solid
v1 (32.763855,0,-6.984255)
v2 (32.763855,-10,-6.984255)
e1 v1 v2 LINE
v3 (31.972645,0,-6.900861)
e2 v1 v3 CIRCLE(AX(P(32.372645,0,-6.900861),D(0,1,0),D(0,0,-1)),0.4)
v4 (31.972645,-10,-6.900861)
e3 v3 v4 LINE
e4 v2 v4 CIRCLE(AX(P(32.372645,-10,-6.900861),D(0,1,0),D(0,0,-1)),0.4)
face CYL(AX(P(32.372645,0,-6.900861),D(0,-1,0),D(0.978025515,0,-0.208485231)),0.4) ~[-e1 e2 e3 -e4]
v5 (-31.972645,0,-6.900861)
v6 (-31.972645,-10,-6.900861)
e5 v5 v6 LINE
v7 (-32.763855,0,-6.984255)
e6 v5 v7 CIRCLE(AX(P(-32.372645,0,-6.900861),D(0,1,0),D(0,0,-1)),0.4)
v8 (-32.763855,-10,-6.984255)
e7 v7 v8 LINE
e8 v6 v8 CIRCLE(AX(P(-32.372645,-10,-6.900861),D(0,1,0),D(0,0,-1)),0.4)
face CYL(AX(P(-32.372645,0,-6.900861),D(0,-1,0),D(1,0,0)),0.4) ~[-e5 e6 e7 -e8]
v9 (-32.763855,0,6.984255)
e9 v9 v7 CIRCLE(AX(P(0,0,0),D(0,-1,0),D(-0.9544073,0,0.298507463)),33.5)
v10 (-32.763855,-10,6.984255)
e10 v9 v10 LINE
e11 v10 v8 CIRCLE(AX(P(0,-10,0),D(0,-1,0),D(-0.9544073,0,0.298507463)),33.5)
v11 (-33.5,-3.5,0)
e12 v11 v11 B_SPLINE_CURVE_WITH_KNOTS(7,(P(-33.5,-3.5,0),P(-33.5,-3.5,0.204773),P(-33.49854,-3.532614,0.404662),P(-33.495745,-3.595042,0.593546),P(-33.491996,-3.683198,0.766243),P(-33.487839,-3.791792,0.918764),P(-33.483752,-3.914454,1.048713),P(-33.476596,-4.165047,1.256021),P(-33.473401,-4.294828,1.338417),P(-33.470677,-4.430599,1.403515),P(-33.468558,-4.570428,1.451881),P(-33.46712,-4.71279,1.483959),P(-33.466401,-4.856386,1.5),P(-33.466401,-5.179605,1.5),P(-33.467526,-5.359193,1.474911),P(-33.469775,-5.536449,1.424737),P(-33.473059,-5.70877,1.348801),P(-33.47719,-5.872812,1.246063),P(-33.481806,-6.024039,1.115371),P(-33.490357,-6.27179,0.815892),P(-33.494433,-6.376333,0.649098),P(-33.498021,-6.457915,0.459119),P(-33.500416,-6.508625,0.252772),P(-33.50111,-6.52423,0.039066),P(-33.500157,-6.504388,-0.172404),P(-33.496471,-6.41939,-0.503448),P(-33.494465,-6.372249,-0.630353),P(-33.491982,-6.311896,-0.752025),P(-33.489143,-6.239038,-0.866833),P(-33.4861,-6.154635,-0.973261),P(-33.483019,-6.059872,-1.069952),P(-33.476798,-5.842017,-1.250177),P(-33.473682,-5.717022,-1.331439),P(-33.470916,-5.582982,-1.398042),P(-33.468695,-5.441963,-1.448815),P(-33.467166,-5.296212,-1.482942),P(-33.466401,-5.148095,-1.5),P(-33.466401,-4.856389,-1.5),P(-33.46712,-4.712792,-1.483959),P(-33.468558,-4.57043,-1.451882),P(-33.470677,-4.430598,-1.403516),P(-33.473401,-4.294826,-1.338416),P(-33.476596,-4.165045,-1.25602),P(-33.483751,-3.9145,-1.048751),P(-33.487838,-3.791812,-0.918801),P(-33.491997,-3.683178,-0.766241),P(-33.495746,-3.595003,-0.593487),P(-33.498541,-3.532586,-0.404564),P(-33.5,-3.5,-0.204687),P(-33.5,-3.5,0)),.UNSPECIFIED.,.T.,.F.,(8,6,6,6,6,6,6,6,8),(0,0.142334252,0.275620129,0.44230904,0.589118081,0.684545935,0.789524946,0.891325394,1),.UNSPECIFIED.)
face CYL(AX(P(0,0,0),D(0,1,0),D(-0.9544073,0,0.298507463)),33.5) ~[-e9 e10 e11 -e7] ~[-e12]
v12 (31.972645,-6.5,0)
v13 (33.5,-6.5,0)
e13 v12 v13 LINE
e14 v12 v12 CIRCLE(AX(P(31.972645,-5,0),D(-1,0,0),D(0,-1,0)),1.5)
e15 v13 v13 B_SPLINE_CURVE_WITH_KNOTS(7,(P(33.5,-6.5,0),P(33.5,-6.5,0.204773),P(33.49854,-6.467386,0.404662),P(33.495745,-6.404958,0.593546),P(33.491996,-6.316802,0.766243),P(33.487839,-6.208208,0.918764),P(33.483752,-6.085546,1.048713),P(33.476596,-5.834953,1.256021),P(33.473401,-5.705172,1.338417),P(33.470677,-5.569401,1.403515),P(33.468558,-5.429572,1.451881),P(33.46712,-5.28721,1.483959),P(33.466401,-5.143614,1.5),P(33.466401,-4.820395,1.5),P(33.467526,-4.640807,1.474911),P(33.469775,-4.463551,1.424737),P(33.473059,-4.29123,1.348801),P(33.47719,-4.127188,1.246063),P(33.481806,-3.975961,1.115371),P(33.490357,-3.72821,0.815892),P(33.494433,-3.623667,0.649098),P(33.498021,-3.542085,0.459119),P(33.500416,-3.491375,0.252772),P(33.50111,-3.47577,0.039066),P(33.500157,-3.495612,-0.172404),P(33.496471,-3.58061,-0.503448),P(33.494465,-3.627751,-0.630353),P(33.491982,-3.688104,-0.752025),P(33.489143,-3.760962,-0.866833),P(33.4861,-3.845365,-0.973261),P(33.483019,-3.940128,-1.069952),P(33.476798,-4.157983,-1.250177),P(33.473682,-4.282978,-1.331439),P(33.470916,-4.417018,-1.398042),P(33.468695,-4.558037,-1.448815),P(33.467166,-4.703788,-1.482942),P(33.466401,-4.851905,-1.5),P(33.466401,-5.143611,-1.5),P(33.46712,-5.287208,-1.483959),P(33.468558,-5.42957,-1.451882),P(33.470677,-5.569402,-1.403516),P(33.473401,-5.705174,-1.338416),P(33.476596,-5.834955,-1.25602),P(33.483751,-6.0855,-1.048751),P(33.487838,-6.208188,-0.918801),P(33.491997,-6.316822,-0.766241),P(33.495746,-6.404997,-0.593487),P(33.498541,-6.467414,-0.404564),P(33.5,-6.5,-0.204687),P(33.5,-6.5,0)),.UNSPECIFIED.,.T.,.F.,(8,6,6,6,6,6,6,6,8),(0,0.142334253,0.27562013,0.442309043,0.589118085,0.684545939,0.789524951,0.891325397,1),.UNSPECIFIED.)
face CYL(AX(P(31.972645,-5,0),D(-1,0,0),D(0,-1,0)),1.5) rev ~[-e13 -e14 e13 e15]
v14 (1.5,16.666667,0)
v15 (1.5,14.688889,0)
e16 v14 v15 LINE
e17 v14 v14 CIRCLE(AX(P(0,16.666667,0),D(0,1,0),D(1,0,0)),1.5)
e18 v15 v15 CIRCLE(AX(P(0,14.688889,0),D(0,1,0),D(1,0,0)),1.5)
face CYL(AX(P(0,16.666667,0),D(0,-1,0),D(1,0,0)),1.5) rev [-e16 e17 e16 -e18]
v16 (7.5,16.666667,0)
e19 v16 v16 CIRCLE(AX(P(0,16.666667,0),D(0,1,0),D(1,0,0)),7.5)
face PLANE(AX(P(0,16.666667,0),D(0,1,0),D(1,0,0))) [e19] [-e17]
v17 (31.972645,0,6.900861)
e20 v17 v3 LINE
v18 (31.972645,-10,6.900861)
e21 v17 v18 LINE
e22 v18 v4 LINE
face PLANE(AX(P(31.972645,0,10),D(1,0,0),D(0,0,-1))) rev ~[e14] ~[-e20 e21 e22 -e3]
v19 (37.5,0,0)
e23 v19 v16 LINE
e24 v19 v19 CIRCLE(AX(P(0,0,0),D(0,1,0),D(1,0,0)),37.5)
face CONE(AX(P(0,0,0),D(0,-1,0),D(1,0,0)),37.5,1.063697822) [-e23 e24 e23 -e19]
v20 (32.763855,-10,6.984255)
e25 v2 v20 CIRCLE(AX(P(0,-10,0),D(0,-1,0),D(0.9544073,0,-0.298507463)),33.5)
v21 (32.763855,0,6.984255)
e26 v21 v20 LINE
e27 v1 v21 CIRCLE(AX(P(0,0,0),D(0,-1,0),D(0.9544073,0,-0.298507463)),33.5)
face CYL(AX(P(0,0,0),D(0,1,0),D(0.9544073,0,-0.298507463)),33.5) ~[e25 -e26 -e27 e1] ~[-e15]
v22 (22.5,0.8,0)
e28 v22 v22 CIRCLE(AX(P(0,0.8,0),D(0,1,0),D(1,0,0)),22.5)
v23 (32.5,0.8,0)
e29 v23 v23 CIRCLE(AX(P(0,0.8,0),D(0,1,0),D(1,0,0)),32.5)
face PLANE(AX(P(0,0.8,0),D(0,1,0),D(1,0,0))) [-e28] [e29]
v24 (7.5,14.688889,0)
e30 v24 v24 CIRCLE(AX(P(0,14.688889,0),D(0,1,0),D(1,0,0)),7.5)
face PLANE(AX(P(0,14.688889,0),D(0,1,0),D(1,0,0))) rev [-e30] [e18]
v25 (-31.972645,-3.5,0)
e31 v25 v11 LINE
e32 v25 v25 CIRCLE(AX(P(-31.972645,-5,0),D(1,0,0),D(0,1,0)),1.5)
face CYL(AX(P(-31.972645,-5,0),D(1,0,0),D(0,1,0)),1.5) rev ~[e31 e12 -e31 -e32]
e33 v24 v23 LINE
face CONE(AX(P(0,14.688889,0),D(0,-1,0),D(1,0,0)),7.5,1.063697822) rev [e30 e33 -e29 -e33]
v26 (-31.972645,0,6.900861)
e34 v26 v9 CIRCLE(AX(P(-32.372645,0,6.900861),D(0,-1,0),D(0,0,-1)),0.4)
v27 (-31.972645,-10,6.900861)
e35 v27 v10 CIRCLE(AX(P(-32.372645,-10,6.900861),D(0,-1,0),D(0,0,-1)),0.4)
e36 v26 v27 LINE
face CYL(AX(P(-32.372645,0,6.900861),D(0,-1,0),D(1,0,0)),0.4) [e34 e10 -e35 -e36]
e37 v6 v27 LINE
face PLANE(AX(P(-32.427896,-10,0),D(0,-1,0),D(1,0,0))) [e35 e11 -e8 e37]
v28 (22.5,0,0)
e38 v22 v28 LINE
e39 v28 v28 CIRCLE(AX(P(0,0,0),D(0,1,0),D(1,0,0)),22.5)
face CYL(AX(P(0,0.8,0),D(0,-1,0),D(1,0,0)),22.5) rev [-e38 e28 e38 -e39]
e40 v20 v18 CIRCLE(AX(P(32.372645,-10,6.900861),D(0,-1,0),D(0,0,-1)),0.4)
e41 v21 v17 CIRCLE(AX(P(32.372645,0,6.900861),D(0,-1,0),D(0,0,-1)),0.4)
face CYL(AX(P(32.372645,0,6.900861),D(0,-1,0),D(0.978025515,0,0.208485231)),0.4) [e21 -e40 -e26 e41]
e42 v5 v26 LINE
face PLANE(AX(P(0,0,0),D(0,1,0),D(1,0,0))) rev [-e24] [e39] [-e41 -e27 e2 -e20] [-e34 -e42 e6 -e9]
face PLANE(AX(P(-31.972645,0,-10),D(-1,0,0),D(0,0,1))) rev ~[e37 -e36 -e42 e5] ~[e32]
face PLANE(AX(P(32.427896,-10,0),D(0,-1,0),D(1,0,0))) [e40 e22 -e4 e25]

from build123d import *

# Parameters (mm, degrees)
F3_DEPTH = 10
F4_R     = 1.5
F5_DEPTH = 25
F6_R     = 1.5
F7_DEPTH = 25
F8_F1_R  = 0.4
F8_F2_R  = 0.4
F8_F3_R  = 0.4
F8_F4_R  = 0.4


# Not quite as in the source:
# - a feature names something its author has since deleted; it is built from what else it names


with BuildPart() as f1:
    # F0 (on Top) → F1 (revolve)
    with BuildSketch(Plane.XY):
        Polygon((22.5, 0.8), (22.5, 0), (37.5, 0), (7.5, 16.6666666667), (1.5, 16.6666666667), (1.5, 14.6888888889), (7.5, 14.6888888889), (32.5, 0.8), align=None)
    revolve(axis=Axis((0, 10, 0), (0, 1, 0)))

    # F2 (on face) → F3 (join)
    with BuildSketch(Plane.XZ):
        with BuildLine():
            Line((-31.9726445575, -10), (-31.9726445575, 10))
            ThreePointArc((-31.9726445575, 10), (-33.5, 0), (-31.9726445575, -10))
        make_face()
        with BuildLine():
            ThreePointArc((31.9726445575, -10), (33.5, 0), (31.9726445575, 10))
            Line((31.9726445575, 10), (31.9726445575, -10))
        make_face()
    extrude(amount=F3_DEPTH)

    # F4 (on face) → F5 (cut)
    with BuildSketch(Plane.YZ.offset(-31.9726445575)):
        with Locations((-5, 0)):
            Circle(F4_R)
    extrude(amount=-F5_DEPTH, mode=Mode.SUBTRACT)

    # F6 (on face) → F7 (cut)
    with BuildSketch(Plane(origin=(31.9726445575, 0, 0), x_dir=(0, -1, 0), z_dir=(-1, 0, 0))):
        with Locations((5, 0)):
            Circle(F6_R)
    extrude(amount=-F7_DEPTH, mode=Mode.SUBTRACT)

    # F8: fillet of radius 0.4 on 4 edges, made by hand

    # F8_f1
    f8_f1_edges = [f1.edges().sort_by_distance(p)[0] for p in [
        (31.9726445575, -5, 10),
    ]]
    fillet(f8_f1_edges, radius=F8_F1_R)

    # F8_f2
    f8_f2_edges = [f1.edges().sort_by_distance(p)[0] for p in [
        (31.9726445575, -5, -10),
    ]]
    fillet(f8_f2_edges, radius=F8_F2_R)

    # F8_f3
    f8_f3_edges = [f1.edges().sort_by_distance(p)[0] for p in [
        (-31.9726445575, -5, -10),
    ]]
    fillet(f8_f3_edges, radius=F8_F3_R)

    # F8_f4
    f8_f4_edges = [f1.edges().sort_by_distance(p)[0] for p in [
        (-31.9726445575, -5, 10),
    ]]
    fillet(f8_f4_edges, radius=F8_F4_R)


solid = f1.part
